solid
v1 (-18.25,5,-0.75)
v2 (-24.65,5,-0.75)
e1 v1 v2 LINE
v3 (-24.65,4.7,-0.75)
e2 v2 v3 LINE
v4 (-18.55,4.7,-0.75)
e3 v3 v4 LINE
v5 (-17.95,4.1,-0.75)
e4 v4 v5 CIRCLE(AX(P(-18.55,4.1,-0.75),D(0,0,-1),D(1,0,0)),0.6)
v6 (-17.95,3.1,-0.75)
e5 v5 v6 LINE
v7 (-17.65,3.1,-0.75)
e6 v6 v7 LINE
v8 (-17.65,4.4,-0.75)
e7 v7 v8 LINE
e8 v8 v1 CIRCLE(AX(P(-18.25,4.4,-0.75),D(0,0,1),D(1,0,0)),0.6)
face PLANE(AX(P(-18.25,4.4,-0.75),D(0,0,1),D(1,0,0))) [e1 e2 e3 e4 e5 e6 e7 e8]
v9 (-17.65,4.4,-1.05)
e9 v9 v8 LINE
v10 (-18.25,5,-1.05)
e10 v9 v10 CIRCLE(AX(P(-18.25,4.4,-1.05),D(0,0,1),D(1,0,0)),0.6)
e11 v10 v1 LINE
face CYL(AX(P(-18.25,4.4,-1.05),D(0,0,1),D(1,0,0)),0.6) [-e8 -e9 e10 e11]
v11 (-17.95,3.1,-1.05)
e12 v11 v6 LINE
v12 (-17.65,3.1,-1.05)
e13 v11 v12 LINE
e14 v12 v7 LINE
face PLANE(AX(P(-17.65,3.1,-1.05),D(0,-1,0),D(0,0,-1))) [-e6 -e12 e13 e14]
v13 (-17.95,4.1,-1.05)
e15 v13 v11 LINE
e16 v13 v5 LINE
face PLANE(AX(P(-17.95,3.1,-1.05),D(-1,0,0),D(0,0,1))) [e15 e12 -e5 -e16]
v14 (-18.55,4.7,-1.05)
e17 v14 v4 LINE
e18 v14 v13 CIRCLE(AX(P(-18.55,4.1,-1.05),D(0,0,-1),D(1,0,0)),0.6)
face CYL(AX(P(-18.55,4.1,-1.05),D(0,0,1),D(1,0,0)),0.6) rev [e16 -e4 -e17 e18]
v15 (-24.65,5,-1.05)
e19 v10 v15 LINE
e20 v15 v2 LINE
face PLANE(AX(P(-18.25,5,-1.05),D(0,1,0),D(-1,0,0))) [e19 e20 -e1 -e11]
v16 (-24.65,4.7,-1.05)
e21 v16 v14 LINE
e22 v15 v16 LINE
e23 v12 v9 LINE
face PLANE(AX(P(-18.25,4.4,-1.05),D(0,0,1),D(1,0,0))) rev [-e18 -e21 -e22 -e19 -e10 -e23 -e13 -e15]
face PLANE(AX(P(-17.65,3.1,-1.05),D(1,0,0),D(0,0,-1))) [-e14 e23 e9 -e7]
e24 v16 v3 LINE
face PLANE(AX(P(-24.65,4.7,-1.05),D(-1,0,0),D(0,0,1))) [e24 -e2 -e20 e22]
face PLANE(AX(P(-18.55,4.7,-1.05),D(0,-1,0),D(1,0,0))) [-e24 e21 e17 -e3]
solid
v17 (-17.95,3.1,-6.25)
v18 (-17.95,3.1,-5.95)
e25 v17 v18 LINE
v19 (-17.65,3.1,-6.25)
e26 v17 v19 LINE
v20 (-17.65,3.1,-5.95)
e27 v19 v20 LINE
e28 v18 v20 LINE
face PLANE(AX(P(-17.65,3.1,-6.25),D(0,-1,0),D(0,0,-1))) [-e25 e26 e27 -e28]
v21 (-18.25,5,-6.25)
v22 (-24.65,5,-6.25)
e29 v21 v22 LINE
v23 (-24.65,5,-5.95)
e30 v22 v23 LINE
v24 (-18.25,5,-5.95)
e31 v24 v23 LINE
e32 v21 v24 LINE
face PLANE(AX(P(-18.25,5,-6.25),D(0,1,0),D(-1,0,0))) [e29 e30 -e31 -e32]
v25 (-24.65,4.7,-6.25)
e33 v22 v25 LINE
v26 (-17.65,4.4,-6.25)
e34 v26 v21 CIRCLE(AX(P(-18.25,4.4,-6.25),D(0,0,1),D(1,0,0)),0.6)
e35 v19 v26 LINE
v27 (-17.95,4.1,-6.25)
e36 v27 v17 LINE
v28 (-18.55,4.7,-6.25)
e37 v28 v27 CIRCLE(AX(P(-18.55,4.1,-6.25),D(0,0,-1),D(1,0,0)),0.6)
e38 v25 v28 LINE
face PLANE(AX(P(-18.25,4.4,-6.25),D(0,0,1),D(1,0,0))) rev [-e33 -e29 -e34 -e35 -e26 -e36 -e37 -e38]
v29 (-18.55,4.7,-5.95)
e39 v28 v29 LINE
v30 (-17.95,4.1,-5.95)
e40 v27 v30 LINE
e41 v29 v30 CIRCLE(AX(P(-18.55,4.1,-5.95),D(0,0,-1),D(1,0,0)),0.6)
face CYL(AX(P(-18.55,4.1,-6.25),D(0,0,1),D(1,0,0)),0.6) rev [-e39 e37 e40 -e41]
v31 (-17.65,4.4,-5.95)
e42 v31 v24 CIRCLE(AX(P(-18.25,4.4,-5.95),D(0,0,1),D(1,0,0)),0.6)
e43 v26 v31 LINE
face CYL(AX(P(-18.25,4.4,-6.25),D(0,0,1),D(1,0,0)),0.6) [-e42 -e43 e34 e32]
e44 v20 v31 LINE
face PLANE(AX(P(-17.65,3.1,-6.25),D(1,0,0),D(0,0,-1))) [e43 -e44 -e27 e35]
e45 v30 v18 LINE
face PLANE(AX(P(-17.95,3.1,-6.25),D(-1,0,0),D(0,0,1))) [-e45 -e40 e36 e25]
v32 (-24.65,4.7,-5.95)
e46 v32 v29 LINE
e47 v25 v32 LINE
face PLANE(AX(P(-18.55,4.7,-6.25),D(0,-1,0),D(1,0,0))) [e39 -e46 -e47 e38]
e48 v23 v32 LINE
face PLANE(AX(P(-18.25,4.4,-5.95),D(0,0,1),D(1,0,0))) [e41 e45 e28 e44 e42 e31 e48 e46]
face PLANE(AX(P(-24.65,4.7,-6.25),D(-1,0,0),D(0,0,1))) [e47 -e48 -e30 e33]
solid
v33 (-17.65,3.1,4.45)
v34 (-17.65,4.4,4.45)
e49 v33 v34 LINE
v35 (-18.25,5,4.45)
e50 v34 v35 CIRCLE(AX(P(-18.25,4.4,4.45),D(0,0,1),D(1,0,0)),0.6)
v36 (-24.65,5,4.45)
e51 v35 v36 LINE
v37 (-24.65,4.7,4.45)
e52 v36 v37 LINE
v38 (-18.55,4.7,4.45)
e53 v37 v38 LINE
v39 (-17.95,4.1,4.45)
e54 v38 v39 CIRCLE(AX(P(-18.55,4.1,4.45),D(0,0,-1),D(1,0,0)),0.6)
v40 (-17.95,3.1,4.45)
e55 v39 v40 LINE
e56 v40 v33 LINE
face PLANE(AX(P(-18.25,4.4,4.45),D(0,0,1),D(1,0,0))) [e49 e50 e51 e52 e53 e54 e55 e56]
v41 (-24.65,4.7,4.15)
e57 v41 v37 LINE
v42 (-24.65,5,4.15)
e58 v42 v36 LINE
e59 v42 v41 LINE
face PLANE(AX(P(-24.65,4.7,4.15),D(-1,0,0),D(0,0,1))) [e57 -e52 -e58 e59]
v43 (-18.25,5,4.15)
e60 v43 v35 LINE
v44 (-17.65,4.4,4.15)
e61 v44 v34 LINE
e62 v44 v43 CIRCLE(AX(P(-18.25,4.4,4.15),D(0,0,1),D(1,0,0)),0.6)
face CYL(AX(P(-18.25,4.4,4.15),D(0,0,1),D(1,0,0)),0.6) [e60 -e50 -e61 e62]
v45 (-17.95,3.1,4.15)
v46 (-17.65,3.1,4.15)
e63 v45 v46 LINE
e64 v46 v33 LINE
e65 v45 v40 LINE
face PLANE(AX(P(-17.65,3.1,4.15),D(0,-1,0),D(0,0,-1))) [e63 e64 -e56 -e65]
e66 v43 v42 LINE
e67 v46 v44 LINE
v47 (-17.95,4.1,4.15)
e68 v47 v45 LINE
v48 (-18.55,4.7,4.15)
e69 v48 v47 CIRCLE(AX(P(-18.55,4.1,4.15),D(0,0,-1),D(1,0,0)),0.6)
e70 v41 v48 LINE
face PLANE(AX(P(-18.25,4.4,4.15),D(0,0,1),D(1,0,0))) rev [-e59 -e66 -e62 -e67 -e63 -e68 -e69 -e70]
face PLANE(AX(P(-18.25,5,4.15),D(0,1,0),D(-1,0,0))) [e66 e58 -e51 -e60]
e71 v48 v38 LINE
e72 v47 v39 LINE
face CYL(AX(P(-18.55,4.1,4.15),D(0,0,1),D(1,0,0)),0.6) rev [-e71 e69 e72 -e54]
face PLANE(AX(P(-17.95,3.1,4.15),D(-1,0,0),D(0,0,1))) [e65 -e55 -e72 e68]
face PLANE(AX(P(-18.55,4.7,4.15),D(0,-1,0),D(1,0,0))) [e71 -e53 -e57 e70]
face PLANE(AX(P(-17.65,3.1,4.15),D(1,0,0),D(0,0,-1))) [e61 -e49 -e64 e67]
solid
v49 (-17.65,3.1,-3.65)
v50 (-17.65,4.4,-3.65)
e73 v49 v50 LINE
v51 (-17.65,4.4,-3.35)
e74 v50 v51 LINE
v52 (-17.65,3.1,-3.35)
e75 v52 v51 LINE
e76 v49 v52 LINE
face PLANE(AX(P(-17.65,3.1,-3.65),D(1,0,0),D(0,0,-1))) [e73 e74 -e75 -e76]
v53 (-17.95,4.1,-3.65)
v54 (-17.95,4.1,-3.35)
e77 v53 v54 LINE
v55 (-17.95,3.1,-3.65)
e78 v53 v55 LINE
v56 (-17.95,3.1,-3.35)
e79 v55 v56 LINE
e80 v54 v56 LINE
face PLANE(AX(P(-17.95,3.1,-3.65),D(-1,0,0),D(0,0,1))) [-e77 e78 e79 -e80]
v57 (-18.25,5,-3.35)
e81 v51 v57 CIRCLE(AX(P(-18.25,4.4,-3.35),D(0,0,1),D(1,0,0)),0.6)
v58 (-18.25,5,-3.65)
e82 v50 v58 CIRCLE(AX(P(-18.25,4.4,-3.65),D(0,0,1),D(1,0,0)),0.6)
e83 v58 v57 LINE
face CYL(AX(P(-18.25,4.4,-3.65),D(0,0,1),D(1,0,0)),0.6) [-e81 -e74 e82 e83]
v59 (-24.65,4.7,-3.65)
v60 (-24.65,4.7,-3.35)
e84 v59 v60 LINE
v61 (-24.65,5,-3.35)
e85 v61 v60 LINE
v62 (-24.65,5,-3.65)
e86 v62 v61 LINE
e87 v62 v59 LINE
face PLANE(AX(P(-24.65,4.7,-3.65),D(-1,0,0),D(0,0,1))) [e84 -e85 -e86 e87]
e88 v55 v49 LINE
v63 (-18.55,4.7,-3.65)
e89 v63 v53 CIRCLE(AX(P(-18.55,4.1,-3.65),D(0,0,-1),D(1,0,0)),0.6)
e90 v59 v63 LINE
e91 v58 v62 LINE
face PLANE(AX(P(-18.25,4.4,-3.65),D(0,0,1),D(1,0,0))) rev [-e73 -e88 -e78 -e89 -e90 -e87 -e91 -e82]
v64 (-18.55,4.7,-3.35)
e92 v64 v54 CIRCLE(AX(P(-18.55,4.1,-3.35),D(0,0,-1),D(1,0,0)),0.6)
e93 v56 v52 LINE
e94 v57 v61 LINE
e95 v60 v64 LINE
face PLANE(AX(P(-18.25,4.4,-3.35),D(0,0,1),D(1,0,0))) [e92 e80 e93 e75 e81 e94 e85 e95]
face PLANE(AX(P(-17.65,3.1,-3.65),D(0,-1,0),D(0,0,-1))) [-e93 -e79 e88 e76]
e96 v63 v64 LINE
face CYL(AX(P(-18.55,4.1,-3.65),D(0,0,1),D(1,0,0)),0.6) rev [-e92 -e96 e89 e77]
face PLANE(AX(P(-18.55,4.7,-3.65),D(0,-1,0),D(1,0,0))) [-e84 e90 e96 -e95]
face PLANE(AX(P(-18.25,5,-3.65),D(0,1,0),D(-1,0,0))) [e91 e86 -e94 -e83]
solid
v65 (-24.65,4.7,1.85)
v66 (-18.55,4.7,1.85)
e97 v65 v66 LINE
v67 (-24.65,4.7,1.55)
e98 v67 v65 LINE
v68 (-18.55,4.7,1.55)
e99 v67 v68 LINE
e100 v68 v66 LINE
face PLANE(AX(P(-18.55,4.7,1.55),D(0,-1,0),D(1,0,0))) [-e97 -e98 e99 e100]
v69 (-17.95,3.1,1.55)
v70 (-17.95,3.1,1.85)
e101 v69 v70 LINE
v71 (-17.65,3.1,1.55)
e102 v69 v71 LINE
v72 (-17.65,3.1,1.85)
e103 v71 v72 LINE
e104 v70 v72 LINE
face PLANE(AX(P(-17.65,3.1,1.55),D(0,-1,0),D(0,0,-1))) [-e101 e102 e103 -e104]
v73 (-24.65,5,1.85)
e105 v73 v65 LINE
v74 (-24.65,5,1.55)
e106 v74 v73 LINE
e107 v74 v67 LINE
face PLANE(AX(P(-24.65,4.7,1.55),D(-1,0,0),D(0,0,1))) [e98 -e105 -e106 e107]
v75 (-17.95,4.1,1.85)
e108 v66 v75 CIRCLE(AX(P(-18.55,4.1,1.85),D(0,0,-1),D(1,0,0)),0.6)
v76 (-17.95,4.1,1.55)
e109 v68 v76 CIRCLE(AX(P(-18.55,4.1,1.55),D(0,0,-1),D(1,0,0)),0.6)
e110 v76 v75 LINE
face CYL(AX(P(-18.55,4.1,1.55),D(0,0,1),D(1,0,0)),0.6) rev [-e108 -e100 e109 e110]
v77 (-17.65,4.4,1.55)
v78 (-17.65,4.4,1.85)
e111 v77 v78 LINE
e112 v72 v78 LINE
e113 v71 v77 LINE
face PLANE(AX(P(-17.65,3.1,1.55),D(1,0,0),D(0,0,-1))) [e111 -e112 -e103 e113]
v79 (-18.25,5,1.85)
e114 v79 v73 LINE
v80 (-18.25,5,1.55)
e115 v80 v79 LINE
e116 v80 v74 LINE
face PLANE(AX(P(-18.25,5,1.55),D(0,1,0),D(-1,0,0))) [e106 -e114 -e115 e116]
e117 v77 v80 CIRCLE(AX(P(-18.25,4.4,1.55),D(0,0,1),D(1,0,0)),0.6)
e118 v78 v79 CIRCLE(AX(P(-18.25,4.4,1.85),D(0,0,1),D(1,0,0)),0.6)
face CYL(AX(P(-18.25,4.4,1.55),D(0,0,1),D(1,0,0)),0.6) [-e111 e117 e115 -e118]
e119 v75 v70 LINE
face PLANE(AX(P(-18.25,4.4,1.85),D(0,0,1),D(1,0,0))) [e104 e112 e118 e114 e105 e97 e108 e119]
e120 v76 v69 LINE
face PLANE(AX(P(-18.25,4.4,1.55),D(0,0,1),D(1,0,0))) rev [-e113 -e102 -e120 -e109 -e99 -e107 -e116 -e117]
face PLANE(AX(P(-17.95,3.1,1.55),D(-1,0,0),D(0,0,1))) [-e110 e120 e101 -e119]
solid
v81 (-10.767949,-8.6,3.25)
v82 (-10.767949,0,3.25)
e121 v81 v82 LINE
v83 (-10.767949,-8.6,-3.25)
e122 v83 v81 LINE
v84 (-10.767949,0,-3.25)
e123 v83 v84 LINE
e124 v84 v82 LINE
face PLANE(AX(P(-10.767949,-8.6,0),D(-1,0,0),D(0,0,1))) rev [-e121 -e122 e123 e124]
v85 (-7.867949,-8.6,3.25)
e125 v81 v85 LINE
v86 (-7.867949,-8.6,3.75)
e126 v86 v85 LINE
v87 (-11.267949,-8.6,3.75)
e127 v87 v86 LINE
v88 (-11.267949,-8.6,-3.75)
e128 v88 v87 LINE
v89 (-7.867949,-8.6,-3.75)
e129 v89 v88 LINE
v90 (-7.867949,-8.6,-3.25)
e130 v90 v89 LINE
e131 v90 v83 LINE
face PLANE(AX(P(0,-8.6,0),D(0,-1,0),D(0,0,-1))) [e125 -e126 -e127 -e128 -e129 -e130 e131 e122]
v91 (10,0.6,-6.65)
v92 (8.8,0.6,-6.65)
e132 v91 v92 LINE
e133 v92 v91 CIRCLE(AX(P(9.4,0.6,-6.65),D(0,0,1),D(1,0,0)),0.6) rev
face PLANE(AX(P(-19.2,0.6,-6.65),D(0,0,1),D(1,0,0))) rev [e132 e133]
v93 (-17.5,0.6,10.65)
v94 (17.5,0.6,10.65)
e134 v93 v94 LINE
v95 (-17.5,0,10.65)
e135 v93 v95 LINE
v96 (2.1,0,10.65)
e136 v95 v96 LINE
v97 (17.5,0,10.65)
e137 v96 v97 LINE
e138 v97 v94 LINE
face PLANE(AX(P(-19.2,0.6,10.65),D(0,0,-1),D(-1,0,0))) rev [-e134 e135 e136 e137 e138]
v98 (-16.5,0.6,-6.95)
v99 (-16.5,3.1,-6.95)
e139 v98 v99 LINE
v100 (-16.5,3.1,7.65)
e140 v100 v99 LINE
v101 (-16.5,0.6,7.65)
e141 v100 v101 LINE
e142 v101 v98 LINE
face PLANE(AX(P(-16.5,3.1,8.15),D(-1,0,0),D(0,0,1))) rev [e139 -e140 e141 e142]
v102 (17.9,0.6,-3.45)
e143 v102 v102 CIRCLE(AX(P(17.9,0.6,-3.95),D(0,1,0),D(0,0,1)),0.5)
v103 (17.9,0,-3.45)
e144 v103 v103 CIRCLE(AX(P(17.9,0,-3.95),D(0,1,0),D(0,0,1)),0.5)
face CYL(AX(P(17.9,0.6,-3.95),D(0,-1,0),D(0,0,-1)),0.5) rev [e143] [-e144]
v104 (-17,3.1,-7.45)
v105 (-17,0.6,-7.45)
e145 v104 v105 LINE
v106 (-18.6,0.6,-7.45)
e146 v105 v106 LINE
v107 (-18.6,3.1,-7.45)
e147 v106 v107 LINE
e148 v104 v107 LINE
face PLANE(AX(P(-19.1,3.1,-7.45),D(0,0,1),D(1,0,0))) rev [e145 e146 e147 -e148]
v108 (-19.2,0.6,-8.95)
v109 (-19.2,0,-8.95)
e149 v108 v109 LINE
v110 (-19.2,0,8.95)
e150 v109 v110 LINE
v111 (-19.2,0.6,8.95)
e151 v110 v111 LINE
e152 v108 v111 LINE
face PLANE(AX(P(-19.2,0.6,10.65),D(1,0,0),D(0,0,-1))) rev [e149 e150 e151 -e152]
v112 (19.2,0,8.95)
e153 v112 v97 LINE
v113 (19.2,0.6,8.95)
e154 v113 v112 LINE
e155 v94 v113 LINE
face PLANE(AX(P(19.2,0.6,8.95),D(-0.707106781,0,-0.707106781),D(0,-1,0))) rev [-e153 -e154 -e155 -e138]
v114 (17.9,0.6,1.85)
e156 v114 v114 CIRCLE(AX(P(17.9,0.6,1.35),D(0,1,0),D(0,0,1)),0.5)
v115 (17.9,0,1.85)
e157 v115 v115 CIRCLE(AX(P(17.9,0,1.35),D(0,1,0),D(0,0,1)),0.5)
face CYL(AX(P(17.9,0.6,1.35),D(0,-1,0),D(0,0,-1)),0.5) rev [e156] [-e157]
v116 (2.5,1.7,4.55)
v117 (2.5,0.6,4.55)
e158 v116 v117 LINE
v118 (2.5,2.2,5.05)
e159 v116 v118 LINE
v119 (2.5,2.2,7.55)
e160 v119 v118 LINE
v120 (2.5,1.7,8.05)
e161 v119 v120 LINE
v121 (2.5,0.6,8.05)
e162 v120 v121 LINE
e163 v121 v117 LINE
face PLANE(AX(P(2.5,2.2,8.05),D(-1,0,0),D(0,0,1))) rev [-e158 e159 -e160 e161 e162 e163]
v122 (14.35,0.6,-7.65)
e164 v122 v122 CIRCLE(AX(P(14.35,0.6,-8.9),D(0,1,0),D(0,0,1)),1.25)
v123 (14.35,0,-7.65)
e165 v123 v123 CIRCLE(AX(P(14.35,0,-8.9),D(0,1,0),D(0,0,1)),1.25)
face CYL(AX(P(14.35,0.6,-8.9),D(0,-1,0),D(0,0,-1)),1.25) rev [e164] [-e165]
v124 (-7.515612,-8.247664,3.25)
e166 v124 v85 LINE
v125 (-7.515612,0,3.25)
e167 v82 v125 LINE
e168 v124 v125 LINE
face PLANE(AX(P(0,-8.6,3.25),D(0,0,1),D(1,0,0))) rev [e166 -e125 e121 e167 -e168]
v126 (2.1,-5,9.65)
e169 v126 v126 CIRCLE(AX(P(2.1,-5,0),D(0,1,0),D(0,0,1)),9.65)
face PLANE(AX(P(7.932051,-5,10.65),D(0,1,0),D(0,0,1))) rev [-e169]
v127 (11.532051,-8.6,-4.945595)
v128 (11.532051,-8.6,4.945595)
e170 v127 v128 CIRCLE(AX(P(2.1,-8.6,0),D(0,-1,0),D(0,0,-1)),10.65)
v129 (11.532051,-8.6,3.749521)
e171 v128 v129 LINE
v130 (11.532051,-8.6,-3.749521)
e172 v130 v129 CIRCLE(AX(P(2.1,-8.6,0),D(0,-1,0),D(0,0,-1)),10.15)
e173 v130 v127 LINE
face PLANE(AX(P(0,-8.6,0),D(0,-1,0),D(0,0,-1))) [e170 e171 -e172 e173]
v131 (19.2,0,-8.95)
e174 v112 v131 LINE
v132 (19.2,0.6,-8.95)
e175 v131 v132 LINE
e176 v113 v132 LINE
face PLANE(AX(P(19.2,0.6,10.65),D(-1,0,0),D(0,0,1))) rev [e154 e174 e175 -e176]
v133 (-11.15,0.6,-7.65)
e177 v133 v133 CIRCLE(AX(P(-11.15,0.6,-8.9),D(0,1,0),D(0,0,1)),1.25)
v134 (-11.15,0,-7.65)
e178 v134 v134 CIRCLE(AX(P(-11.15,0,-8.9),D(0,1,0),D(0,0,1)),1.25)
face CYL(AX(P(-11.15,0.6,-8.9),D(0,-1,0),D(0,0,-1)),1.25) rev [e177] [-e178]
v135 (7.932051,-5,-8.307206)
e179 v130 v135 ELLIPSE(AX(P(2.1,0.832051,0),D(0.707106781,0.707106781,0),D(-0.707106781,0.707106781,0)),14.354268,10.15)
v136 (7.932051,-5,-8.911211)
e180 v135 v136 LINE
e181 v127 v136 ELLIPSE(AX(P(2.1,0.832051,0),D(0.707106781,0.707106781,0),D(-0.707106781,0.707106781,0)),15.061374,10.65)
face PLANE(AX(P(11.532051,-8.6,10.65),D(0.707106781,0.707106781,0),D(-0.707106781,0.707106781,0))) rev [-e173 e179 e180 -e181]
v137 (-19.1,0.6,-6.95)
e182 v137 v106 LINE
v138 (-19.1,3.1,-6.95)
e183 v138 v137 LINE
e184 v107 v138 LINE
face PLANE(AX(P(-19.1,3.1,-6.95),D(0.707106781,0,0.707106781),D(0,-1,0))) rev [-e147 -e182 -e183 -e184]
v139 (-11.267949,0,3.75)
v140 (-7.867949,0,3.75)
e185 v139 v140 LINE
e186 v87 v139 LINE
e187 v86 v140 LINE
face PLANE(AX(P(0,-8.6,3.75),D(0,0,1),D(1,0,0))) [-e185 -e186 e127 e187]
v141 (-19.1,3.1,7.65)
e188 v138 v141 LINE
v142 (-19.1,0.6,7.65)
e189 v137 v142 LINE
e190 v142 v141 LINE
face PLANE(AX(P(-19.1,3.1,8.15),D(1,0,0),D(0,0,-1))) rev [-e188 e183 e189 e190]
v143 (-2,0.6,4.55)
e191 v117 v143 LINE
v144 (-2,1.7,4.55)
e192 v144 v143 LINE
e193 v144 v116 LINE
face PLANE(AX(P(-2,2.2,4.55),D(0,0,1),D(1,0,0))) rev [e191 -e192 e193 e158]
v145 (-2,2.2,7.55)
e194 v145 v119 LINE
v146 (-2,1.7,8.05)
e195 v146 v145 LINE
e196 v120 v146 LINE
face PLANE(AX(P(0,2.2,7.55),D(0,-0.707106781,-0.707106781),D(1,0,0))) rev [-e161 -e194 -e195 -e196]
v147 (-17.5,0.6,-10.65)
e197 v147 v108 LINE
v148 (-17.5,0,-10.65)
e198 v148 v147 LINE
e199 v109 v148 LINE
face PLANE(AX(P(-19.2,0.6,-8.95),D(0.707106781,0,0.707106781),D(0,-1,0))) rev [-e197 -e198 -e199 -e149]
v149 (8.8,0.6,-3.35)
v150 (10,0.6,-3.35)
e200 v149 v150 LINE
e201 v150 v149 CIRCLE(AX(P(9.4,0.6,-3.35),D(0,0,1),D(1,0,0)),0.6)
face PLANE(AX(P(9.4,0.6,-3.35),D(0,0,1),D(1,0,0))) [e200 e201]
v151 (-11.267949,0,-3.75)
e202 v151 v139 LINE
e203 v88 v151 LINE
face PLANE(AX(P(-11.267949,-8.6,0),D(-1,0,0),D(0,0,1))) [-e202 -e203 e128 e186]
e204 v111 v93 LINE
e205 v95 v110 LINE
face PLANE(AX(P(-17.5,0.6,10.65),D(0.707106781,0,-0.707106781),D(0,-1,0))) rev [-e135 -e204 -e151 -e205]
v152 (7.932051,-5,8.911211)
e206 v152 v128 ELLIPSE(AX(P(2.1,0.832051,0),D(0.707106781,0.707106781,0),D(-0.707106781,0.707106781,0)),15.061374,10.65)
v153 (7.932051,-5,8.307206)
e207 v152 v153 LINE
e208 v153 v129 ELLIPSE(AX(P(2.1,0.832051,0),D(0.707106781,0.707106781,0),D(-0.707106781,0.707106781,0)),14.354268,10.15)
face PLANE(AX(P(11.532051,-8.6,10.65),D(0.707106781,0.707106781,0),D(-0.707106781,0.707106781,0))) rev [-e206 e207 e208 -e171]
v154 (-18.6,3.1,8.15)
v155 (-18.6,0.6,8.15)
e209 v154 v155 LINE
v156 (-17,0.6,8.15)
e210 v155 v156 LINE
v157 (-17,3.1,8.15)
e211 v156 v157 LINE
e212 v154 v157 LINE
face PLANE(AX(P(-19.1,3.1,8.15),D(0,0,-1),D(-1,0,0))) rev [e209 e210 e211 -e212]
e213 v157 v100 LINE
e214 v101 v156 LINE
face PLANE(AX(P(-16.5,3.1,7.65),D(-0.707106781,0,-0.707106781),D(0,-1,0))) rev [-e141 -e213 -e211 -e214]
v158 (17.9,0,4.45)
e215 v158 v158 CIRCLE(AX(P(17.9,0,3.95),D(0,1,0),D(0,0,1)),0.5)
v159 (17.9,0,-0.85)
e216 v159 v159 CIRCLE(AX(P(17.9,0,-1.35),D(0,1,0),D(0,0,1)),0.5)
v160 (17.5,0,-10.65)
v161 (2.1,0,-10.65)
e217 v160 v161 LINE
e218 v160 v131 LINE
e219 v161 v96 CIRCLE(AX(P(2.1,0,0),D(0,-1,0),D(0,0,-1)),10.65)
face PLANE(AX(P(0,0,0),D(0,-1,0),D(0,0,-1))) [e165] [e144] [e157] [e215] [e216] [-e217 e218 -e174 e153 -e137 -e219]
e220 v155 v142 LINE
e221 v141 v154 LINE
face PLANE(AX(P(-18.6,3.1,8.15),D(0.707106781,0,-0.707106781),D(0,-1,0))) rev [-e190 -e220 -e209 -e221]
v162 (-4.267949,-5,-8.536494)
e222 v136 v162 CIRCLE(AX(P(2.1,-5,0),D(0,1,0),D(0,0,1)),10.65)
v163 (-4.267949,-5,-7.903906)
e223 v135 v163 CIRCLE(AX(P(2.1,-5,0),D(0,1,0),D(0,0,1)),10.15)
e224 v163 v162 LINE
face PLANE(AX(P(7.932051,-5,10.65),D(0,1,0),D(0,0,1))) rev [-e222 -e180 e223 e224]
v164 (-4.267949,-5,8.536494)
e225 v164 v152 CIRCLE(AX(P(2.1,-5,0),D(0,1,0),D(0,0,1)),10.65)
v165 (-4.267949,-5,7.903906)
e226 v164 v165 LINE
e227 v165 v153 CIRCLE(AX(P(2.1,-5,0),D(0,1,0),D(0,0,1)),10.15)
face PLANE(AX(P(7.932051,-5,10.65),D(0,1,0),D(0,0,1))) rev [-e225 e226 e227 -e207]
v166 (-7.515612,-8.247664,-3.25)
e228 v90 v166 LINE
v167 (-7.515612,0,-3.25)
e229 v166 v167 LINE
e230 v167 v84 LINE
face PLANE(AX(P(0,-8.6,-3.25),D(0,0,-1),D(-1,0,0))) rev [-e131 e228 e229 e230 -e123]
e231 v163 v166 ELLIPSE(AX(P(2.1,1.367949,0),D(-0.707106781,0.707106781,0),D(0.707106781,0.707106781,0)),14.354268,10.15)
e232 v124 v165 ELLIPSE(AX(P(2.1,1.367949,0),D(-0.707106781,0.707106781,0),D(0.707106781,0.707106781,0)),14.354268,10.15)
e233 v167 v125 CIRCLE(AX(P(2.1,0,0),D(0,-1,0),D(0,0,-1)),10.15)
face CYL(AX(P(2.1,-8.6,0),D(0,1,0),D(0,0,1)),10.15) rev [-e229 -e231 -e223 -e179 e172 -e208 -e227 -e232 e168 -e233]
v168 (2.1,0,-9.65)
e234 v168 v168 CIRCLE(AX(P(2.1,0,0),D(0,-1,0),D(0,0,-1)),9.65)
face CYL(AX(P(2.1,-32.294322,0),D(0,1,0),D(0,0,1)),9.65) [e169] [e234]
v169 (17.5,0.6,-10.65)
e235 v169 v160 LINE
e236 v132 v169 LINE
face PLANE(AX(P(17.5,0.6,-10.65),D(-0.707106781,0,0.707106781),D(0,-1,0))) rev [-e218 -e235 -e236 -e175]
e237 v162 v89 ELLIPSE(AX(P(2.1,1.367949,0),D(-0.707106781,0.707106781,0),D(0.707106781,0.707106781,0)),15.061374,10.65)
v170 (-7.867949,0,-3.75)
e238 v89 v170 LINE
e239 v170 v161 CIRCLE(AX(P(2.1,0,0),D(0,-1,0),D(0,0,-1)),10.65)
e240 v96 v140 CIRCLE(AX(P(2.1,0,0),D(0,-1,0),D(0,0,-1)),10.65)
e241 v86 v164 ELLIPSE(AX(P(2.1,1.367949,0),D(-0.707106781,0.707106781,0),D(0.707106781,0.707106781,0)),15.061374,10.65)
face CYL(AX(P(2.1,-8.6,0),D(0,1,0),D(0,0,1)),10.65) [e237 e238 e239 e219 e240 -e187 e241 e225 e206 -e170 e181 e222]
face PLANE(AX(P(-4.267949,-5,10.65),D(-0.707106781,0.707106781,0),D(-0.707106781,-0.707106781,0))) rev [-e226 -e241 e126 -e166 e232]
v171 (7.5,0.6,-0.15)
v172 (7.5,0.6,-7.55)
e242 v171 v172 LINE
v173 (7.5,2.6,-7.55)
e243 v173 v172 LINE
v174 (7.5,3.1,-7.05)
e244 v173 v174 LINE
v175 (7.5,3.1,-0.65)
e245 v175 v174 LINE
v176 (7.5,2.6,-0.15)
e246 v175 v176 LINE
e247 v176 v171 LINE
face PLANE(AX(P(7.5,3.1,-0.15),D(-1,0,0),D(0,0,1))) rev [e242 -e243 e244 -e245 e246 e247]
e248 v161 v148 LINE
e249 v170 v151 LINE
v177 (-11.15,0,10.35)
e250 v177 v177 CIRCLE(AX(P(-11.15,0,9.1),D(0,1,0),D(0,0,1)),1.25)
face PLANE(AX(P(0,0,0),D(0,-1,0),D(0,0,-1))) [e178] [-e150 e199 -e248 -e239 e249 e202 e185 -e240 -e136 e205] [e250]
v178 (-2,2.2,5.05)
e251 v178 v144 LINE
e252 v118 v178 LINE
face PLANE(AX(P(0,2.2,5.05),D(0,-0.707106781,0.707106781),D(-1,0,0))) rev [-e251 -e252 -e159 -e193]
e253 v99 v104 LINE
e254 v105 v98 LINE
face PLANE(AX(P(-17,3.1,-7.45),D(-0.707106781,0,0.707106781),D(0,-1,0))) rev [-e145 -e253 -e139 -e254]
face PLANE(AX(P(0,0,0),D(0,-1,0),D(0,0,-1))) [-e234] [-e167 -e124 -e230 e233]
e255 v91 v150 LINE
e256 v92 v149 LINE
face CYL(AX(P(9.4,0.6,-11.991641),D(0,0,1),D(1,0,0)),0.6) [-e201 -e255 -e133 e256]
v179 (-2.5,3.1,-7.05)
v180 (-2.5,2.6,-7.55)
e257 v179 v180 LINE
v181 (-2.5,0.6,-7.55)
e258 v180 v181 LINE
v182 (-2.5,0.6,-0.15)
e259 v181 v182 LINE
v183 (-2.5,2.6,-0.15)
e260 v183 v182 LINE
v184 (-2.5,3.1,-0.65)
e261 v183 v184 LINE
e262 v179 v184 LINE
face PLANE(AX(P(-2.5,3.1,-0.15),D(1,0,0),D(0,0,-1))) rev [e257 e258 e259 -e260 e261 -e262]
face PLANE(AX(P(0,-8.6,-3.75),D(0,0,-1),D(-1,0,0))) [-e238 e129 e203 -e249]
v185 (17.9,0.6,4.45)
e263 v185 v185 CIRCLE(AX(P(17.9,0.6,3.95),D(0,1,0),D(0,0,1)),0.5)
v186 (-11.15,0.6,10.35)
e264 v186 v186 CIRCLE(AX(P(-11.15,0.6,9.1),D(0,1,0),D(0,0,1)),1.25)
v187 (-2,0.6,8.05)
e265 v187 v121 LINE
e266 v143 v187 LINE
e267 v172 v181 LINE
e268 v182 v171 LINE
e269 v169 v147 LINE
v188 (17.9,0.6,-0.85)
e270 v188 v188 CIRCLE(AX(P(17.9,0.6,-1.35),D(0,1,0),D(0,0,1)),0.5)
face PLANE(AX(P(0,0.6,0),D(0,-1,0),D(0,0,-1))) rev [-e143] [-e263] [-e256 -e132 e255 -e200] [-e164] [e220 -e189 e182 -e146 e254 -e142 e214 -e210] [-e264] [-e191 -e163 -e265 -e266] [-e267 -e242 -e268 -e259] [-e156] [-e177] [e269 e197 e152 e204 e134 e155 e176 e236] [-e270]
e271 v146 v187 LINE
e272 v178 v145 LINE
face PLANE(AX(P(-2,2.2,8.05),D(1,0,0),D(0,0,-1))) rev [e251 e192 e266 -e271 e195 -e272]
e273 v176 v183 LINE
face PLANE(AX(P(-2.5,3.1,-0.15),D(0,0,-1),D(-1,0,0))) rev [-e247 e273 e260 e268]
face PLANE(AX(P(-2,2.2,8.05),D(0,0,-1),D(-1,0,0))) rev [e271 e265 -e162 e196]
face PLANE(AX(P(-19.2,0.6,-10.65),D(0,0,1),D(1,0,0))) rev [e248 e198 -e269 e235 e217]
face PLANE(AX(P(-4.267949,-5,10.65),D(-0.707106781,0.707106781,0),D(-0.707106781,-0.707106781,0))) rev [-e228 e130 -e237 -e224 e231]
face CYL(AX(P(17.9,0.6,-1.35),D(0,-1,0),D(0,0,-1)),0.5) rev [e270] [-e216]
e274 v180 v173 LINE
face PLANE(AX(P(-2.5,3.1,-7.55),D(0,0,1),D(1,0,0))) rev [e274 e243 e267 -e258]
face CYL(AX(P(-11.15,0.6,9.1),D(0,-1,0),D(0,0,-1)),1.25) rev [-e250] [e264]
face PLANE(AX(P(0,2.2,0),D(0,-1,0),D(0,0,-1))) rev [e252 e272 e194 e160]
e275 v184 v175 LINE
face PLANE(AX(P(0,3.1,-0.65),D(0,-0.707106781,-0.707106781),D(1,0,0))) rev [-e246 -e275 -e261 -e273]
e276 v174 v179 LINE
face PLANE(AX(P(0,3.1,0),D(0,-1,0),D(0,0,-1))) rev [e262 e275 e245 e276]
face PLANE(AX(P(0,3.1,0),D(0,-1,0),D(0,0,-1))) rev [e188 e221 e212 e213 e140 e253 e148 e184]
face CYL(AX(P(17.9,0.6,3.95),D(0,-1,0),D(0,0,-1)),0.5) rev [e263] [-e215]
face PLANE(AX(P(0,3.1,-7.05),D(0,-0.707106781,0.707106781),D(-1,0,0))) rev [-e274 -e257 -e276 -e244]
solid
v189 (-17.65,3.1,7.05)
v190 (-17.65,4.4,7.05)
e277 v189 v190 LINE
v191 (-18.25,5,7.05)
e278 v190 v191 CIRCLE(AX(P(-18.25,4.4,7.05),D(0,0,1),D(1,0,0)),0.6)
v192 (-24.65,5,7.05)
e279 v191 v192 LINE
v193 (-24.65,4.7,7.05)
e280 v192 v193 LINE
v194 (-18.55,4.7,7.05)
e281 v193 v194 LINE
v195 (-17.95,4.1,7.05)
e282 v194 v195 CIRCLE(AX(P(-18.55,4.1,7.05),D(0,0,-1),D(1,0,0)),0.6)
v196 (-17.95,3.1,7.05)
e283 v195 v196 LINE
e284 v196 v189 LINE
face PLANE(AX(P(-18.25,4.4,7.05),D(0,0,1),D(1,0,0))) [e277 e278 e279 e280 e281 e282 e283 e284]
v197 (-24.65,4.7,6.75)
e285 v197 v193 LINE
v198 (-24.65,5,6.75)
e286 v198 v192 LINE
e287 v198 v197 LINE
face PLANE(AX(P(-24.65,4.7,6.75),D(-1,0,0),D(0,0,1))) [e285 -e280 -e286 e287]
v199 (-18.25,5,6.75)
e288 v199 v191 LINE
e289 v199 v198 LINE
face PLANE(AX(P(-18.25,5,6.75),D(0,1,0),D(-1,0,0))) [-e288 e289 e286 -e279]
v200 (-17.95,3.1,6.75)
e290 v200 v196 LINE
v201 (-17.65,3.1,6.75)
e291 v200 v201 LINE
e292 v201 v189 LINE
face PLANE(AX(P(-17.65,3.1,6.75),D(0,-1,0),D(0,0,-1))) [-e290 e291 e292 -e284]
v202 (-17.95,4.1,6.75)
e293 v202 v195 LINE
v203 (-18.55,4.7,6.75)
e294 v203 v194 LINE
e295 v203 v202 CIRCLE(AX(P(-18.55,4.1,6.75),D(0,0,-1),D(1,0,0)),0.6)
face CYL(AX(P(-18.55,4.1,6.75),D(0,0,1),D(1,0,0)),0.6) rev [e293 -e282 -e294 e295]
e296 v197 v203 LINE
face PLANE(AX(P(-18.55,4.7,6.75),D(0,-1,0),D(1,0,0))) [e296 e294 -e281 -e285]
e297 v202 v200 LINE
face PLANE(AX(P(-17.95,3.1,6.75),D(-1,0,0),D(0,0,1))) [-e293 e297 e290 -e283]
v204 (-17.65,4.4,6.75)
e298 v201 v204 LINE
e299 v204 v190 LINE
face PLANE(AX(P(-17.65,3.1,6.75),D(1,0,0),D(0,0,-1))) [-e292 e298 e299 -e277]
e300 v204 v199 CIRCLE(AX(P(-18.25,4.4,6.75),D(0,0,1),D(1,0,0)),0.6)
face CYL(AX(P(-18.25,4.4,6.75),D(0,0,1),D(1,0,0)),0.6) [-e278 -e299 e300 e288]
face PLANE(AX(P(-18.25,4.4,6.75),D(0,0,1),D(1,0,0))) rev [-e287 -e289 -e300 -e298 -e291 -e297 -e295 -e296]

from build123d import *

# Parameters (mm, degrees)
SKETCH1_W             = 38.4
SKETCH1_H             = 21.3
SKETCH1_R             = 1.25
SKETCH1_R_2           = 0.5
BOSS_EXTRUDE1_DEPTH   = 0.6
CHAMFER1_SIZE         = 1.7
SKETCH3_W             = 2.6
SKETCH3_H             = 2.6
BOSS_EXTRUDE2_DEPTH   = 2.5
BOSS_EXTRUDE3_START   = -1.1
BOSS_EXTRUDE3_DEPTH   = 0.3
LPATTERN4_START       = -6.25
LPATTERN4_DEPTH       = 0.3
LPATTERN4_START_2     = -3.65
LPATTERN4_2_DEPTH     = 0.3
LPATTERN4_START_3     = -1.05
LPATTERN4_3_DEPTH     = 0.3
LPATTERN4_START_4     = 1.55
LPATTERN4_4_DEPTH     = 0.3
LPATTERN4_START_5     = 4.15
LPATTERN4_5_DEPTH     = 0.3
LPATTERN4_START_6     = -19.1
LPATTERN4_6_OUTLINE_W = 2.5
LPATTERN4_6_OUTLINE_H = 13
LPATTERN4_6_DEPTH     = 2.6
CHAMFER3_SIZE         = 0.5
SKETCH5_W             = 10
SKETCH5_H             = 7.4
BOSS_EXTRUDE4_DEPTH   = 2.5
SKETCH6_W             = 4.5
SKETCH6_H             = 3.5
BOSS_EXTRUDE5_DEPTH   = 1.6
CHAMFER4_SIZE         = 0.5
BOSS_EXTRUDE6_START   = -14
BOSS_EXTRUDE6_DEPTH   = 3.3
BOSS_EXTRUDE7_DEPTH   = 8.6
CUT_EXTRUDE1_DEPTH    = 34.693805069
SKETCH13_R            = 9.65
BOSS_EXTRUDE9_DEPTH   = 5


# Read off the part's stored shape, not the designer's step: LPattern4
with BuildPart() as part:
    # Sketch1 → Boss-Extrude1 (new body)
    with BuildSketch(Plane(origin=(0, 0, 0), x_dir=(1, 0, 0), z_dir=(0, 1, 0))):
        Rectangle(SKETCH1_W, SKETCH1_H)
        with Locations(Location((-11.15, 8.9, 0), (0, 0, 270))):
            Circle(SKETCH1_R, mode=Mode.SUBTRACT)
        with Locations(Location((14.35, 8.9, 0), (0, 0, 270))):
            Circle(SKETCH1_R, mode=Mode.SUBTRACT)
        with Locations(Location((-11.15, -9.1, 0), (0, 0, 270))):
            Circle(SKETCH1_R, mode=Mode.SUBTRACT)
        with Locations(Location((17.9, 3.95, 0), (0, 0, 270))):
            Circle(SKETCH1_R_2, mode=Mode.SUBTRACT)
        with Locations(Location((17.9, 1.35, 0), (0, 0, 270))):
            Circle(SKETCH1_R_2, mode=Mode.SUBTRACT)
        with Locations(Location((17.9, -1.35, 0), (0, 0, 270))):
            Circle(SKETCH1_R_2, mode=Mode.SUBTRACT)
        with Locations(Location((17.9, -3.95, 0), (0, 0, 270))):
            Circle(SKETCH1_R_2, mode=Mode.SUBTRACT)
    extrude(amount=BOSS_EXTRUDE1_DEPTH)

    # Chamfer1
    chamfer1_edges = [part.edges().sort_by_distance(p)[0] for p in [
        (-19.2, 0.3, -10.65),
        (19.2, 0.3, -10.65),
        (19.2, 0.3, 10.65),
        (-19.2, 0.3, 10.65),
    ]]
    chamfer(chamfer1_edges, length=CHAMFER1_SIZE)

    # Sketch3 → Boss-Extrude2 (add)
    with BuildSketch(Plane(origin=(0, 0.6, 0), x_dir=(1, 0, 0), z_dir=(0, 1, 0))):
        with Locations((-17.8, -6.85)):
            Rectangle(SKETCH3_W, SKETCH3_H)
    extrude(amount=BOSS_EXTRUDE2_DEPTH)

    # LPattern4 6 outline → LPattern4 6 (add)
    with BuildSketch(Plane.YZ.offset(LPATTERN4_START_6)):
        with Locations((1.85, -0.95)):
            Rectangle(LPATTERN4_6_OUTLINE_W, LPATTERN4_6_OUTLINE_H)
    extrude(amount=LPATTERN4_6_DEPTH)

    # Chamfer3
    chamfer3_edges = [part.edges().sort_by_distance(p)[0] for p in [
        (-19.1, 1.85, 8.15),
        (-16.5, 1.85, 8.15),
        (-19.1, 1.85, -7.45),
        (-16.5, 1.85, -7.45),
    ]]
    chamfer(chamfer3_edges, length=CHAMFER3_SIZE)

    # Sketch5 → Boss-Extrude4 (add)
    with BuildSketch(Plane(origin=(0, 0.6, 0), x_dir=(1, 0, 0), z_dir=(0, 1, 0))):
        with Locations((2.5, 3.85)):
            Rectangle(SKETCH5_W, SKETCH5_H)
    extrude(amount=BOSS_EXTRUDE4_DEPTH)

    # Sketch6 → Boss-Extrude5 (add)
    with BuildSketch(Plane(origin=(0, 0.6, 0), x_dir=(1, 0, 0), z_dir=(0, 1, 0))):
        with Locations((0.25, -6.3)):
            Rectangle(SKETCH6_W, SKETCH6_H)
    extrude(amount=BOSS_EXTRUDE5_DEPTH)

    # Chamfer4
    chamfer4_edges = [part.edges().sort_by_distance(p)[0] for p in [
        (2.5, 3.1, -0.15),
        (2.5, 3.1, -7.55),
        (0.25, 2.2, 8.05),
        (0.25, 2.2, 4.55),
    ]]
    chamfer(chamfer4_edges, length=CHAMFER4_SIZE)

    # Sketch8 → Boss-Extrude6 (add)
    with BuildSketch(Plane.XY.offset(10.65).offset(BOSS_EXTRUDE6_START)):
        with BuildLine():
            Line((8.8, 0.6), (10, 0.6))
            ThreePointArc((10, 0.6), (9.4, 1.2), (8.8, 0.6))
        make_face()
    extrude(amount=-BOSS_EXTRUDE6_DEPTH)

    # Sketch9 → Boss-Extrude7 (add)
    with BuildSketch(Plane.XZ):
        with BuildLine():
            Line((-7.867948636, -3.75), (-11.267948636, -3.75))
            Line((-11.267948636, -3.75), (-11.267948636, 3.75))
            Line((-11.267948636, 3.75), (-7.867948636, 3.75))
            ThreePointArc((-7.867948636, 3.75), (12.75, 0), (-7.867948636, -3.75))
        make_face()
        with BuildLine():
            Line((-10.767948636, 3.25), (-7.515612305, 3.25))
            ThreePointArc((-7.515612305, 3.25), (12.25, 0), (-7.515612305, -3.25))
            Line((-7.515612305, -3.25), (-10.767948636, -3.25))
            Line((-10.767948636, -3.25), (-10.767948636, 3.25))
        make_face(mode=Mode.SUBTRACT)
    extrude(amount=BOSS_EXTRUDE7_DEPTH)

    # Sketch10 → Cut-Extrude1 (cut, through all)
    with BuildSketch(Plane(origin=(0, 0, -10.65), x_dir=(-1, 0, 0), z_dir=(0, 0, -1))):
        Polygon((-11.532051364, -8.6), (-7.932051364, -5), (4.267948636, -5), (7.867948636, -8.6), align=None)
    extrude(amount=-CUT_EXTRUDE1_DEPTH, mode=Mode.SUBTRACT)

    # Sketch13 → Boss-Extrude9 (add)
    with BuildSketch(Plane.XZ):
        with Locations(Location((2.1, 0, 0), (0, 0, 90))):
            Circle(SKETCH13_R)
    extrude(amount=BOSS_EXTRUDE9_DEPTH)


with BuildPart() as body_2:
    # Sketch4 → Boss-Extrude3 (new body)
    with BuildSketch(Plane.XY.offset(8.15).offset(BOSS_EXTRUDE3_START)):
        with BuildLine():
            Line((-17.65, 3.1), (-17.95, 3.1))
            Line((-17.95, 3.1), (-17.95, 4.1))
            ThreePointArc((-17.95, 4.1), (-18.125735931, 4.524264069), (-18.55, 4.7))
            Line((-18.55, 4.7), (-24.65, 4.7))
            Line((-24.65, 4.7), (-24.65, 5))
            Line((-24.65, 5), (-18.25, 5))
            ThreePointArc((-18.25, 5), (-17.825735931, 4.824264069), (-17.65, 4.4))
            Line((-17.65, 4.4), (-17.65, 3.1))
        make_face()
    extrude(amount=-BOSS_EXTRUDE3_DEPTH)


with BuildPart() as body_3:
    # LPattern4 outline → LPattern4 (new body)
    with BuildSketch(Plane.XY.offset(LPATTERN4_START)):
        with BuildLine():
            Line((-17.95, 3.1), (-17.65, 3.1))
            Line((-17.65, 3.1), (-17.65, 4.4))
            ThreePointArc((-17.65, 4.4), (-17.825735931, 4.824264069), (-18.25, 5))
            Line((-18.25, 5), (-24.65, 5))
            Line((-24.65, 5), (-24.65, 4.7))
            Line((-24.65, 4.7), (-18.55, 4.7))
            ThreePointArc((-18.55, 4.7), (-18.125735931, 4.524264069), (-17.95, 4.1))
            Line((-17.95, 4.1), (-17.95, 3.1))
        make_face()
    extrude(amount=LPATTERN4_DEPTH)


with BuildPart() as body_4:
    # LPattern4 2 outline → LPattern4 2 (new body)
    with BuildSketch(Plane.XY.offset(LPATTERN4_START_2)):
        with BuildLine():
            Line((-17.95, 3.1), (-17.65, 3.1))
            Line((-17.65, 3.1), (-17.65, 4.4))
            ThreePointArc((-17.65, 4.4), (-17.825735931, 4.824264069), (-18.25, 5))
            Line((-18.25, 5), (-24.65, 5))
            Line((-24.65, 5), (-24.65, 4.7))
            Line((-24.65, 4.7), (-18.55, 4.7))
            ThreePointArc((-18.55, 4.7), (-18.125735931, 4.524264069), (-17.95, 4.1))
            Line((-17.95, 4.1), (-17.95, 3.1))
        make_face()
    extrude(amount=LPATTERN4_2_DEPTH)


with BuildPart() as body_5:
    # LPattern4 3 outline → LPattern4 3 (new body)
    with BuildSketch(Plane.XY.offset(LPATTERN4_START_3)):
        with BuildLine():
            Line((-17.95, 3.1), (-17.65, 3.1))
            Line((-17.65, 3.1), (-17.65, 4.4))
            ThreePointArc((-17.65, 4.4), (-17.825735931, 4.824264069), (-18.25, 5))
            Line((-18.25, 5), (-24.65, 5))
            Line((-24.65, 5), (-24.65, 4.7))
            Line((-24.65, 4.7), (-18.55, 4.7))
            ThreePointArc((-18.55, 4.7), (-18.125735931, 4.524264069), (-17.95, 4.1))
            Line((-17.95, 4.1), (-17.95, 3.1))
        make_face()
    extrude(amount=LPATTERN4_3_DEPTH)


with BuildPart() as body_6:
    # LPattern4 4 outline → LPattern4 4 (new body)
    with BuildSketch(Plane.XY.offset(LPATTERN4_START_4)):
        with BuildLine():
            Line((-17.95, 3.1), (-17.65, 3.1))
            Line((-17.65, 3.1), (-17.65, 4.4))
            ThreePointArc((-17.65, 4.4), (-17.825735931, 4.824264069), (-18.25, 5))
            Line((-18.25, 5), (-24.65, 5))
            Line((-24.65, 5), (-24.65, 4.7))
            Line((-24.65, 4.7), (-18.55, 4.7))
            ThreePointArc((-18.55, 4.7), (-18.125735931, 4.524264069), (-17.95, 4.1))
            Line((-17.95, 4.1), (-17.95, 3.1))
        make_face()
    extrude(amount=LPATTERN4_4_DEPTH)


with BuildPart() as body_7:
    # LPattern4 5 outline → LPattern4 5 (new body)
    with BuildSketch(Plane.XY.offset(LPATTERN4_START_5)):
        with BuildLine():
            Line((-17.95, 3.1), (-17.65, 3.1))
            Line((-17.65, 3.1), (-17.65, 4.4))
            ThreePointArc((-17.65, 4.4), (-17.825735931, 4.824264069), (-18.25, 5))
            Line((-18.25, 5), (-24.65, 5))
            Line((-24.65, 5), (-24.65, 4.7))
            Line((-24.65, 4.7), (-18.55, 4.7))
            ThreePointArc((-18.55, 4.7), (-18.125735931, 4.524264069), (-17.95, 4.1))
            Line((-17.95, 4.1), (-17.95, 3.1))
        make_face()
    extrude(amount=LPATTERN4_5_DEPTH)


solid = Compound([part.part, body_2.part, body_3.part, body_4.part, body_5.part, body_6.part, body_7.part])
